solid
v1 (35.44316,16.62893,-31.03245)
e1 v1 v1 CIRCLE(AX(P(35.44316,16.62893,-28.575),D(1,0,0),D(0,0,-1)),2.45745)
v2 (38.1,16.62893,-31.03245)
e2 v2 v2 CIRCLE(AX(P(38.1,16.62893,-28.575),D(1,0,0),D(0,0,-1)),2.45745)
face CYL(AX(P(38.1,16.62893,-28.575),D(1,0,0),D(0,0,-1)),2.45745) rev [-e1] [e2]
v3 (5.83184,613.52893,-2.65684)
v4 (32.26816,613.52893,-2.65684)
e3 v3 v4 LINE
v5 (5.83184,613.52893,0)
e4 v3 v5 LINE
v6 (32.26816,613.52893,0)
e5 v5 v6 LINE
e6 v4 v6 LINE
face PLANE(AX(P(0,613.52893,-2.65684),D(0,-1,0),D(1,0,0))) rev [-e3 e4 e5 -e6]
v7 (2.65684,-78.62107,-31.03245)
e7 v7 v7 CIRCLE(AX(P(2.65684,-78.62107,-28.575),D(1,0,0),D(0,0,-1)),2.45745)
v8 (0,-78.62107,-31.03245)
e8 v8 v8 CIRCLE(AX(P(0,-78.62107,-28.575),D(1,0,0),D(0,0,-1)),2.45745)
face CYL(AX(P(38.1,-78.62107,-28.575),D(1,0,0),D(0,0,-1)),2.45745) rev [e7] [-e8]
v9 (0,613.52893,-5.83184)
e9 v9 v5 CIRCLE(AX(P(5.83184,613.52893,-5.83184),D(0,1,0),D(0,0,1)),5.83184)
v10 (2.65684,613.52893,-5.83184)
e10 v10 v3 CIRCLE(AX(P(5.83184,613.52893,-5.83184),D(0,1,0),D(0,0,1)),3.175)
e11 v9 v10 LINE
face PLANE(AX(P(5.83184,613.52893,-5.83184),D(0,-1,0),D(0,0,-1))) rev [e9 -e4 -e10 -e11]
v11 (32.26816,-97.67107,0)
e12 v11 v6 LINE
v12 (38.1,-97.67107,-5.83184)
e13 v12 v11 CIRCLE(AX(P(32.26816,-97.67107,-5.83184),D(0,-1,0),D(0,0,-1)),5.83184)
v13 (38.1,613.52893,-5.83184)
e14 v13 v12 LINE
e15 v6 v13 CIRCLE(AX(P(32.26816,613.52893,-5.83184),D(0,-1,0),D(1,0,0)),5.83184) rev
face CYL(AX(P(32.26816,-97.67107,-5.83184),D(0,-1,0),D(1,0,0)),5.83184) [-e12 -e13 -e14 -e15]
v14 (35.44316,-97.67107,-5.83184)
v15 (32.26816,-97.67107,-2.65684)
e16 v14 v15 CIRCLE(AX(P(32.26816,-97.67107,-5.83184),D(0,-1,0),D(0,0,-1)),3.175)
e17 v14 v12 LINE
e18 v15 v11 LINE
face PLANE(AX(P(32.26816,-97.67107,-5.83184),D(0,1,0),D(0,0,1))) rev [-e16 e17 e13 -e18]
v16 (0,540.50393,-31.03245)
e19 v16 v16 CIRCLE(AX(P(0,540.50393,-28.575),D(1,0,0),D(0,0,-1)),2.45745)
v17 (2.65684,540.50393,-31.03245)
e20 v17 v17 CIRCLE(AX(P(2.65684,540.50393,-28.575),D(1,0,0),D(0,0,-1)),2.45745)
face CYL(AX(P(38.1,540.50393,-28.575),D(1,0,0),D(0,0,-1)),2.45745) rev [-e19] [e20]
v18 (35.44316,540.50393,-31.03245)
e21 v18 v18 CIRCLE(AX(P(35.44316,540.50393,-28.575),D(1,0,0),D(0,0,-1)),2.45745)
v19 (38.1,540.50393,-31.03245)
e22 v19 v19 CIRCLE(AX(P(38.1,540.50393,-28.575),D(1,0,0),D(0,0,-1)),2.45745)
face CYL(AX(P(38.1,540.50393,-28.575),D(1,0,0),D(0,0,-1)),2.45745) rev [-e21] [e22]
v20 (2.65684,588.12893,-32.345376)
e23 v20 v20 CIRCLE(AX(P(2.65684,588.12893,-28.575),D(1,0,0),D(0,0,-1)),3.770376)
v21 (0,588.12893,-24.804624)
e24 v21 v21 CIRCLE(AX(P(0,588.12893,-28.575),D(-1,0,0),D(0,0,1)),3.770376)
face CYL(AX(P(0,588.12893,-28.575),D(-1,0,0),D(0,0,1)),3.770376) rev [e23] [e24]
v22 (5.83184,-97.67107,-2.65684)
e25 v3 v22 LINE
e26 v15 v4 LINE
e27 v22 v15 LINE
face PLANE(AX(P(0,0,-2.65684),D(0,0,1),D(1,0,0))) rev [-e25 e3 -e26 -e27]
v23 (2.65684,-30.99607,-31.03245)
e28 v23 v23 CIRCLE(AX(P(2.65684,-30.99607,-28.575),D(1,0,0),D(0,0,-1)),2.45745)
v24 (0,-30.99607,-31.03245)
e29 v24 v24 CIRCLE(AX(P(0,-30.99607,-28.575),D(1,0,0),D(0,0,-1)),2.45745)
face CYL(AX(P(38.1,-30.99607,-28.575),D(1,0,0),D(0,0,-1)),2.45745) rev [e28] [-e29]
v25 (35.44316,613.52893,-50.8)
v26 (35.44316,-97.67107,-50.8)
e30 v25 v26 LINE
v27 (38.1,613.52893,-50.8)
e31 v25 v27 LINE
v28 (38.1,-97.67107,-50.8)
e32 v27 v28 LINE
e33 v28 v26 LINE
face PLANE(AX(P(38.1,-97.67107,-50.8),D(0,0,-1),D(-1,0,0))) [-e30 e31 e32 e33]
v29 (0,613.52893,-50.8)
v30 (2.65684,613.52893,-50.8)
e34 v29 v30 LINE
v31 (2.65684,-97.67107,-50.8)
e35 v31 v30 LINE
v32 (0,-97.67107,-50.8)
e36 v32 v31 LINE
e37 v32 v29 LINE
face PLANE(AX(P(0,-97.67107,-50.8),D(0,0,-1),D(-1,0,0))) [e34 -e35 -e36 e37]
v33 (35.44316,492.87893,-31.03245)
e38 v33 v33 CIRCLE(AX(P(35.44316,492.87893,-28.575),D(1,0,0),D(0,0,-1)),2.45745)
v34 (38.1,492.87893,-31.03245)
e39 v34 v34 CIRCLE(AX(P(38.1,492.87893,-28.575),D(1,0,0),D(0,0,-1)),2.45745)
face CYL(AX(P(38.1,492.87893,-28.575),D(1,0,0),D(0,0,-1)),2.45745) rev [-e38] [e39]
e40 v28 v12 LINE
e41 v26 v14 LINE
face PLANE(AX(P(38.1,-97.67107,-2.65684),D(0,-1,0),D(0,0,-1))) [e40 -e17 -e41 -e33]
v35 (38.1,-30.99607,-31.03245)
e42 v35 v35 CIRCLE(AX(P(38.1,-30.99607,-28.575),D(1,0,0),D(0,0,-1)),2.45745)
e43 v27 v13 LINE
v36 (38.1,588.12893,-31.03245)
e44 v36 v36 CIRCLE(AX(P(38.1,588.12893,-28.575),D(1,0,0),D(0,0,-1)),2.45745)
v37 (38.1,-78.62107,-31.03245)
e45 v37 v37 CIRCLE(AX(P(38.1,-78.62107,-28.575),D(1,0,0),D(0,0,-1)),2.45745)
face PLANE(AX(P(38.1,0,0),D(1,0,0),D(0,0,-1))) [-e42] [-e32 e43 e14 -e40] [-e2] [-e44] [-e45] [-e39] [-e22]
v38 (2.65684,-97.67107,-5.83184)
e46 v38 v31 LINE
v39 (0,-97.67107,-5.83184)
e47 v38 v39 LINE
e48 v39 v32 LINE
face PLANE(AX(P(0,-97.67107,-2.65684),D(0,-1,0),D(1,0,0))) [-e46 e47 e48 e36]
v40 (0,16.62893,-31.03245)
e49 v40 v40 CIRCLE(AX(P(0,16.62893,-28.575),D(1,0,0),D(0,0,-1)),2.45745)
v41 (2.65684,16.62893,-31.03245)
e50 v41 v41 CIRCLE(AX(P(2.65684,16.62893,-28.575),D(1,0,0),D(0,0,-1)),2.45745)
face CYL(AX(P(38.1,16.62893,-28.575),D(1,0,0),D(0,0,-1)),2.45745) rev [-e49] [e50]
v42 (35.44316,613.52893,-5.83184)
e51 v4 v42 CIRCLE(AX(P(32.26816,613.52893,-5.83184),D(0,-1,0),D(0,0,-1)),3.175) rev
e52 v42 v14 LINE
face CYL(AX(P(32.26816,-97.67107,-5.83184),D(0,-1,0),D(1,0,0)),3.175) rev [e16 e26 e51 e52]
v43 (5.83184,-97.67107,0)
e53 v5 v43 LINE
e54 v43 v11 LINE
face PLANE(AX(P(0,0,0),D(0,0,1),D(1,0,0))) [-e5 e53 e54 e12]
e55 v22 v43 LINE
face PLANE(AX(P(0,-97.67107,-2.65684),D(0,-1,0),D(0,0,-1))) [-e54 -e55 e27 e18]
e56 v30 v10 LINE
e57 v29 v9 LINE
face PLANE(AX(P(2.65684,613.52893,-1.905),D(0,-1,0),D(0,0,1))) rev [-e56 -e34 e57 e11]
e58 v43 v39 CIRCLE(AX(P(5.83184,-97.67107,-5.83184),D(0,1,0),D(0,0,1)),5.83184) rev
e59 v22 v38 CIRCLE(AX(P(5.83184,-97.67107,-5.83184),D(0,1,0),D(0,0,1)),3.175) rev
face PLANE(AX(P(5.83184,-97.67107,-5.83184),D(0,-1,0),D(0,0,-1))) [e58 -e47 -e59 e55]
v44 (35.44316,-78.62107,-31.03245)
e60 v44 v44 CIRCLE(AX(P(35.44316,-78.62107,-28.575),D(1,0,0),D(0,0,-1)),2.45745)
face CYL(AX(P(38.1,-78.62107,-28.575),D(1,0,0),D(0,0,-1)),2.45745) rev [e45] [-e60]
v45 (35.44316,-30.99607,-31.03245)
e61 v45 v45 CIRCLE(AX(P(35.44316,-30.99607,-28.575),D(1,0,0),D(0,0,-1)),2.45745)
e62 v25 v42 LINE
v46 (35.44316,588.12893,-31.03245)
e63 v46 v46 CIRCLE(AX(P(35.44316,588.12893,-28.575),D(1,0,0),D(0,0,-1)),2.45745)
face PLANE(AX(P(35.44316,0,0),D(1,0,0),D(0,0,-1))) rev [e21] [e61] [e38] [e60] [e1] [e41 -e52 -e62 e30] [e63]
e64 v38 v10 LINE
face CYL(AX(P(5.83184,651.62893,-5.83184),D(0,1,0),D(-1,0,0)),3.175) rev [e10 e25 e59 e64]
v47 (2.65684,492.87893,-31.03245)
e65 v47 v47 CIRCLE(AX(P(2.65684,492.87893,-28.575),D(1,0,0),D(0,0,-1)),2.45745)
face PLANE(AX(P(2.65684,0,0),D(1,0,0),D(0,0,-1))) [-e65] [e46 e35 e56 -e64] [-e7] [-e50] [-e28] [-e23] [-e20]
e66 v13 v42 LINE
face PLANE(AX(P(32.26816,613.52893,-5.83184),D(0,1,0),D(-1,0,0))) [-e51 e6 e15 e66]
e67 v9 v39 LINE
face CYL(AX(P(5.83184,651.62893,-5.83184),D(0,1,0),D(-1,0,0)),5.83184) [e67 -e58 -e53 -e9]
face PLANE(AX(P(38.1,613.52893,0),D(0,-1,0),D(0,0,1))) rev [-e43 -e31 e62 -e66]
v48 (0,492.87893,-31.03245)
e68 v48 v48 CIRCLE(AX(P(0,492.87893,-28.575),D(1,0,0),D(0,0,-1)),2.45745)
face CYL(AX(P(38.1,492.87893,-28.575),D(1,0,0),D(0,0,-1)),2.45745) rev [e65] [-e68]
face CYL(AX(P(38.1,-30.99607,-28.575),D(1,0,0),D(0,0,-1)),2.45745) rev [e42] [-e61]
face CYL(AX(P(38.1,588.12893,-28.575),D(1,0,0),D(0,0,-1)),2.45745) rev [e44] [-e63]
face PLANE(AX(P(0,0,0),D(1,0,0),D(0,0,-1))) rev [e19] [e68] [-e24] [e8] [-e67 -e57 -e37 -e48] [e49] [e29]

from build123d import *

# Parameters (mm, degrees)
SKETCH1_W                            = 38.1
SKETCH1_H                            = 749.3
BASE_FLANGE1_DEPTH                   = 2.65684
EDGE_FLANGE1_STRIP_W                 = 16.97736
EDGE_FLANGE1_STRIP_H                 = 2.65684
EDGE_FLANGE1_STRIP_CUT_DEPTH         = 749.3
EDGE_FLANGE1_STRIP_2_W               = 16.97736
EDGE_FLANGE1_STRIP_2_H               = 2.65684
EDGE_FLANGE1_STRIP_CUT_2_DEPTH       = 749.3
EDGE_FLANGE1_DEPTH                   = 749.3
EDGE_FLANGE1_BEND_DEPTH              = 749.3
CUT_EXTRUDE1_START                   = -38.1
CUT_EXTRUDE1_OUTLINE_W               = 50.8
CUT_EXTRUDE1_OUTLINE_H               = 38.1
CUT_EXTRUDE1_DEPTH                   = 38.1
F_10_0_1935_DIAMETER_HOLE1_D         = 4.9149
F_19_64_0_29688_DIAMETER_HOLE3_D     = 7.540752
F_19_64_0_29688_DIAMETER_HOLE3_DEPTH = 35.44216


# Read off the part's stored shape, not the designer's step: Cut-Extrude1
# Sheet-metal steps are written as plain solids
with BuildPart() as part:
    # Sketch1 → Base-Flange1 (new body)
    with BuildSketch(Plane.XY):
        with Locations((19.05, 276.978929766)):
            Rectangle(SKETCH1_W, SKETCH1_H)
    extrude(amount=-BASE_FLANGE1_DEPTH)

    # Edge-Flange1 strip (across the edge) → Edge-Flange1 strip cut (cut)
    with BuildSketch(Plane(origin=(38.1, 651.628929766, -2.65684), x_dir=(-1, 0, 0), z_dir=(0, -1, 0))):
        with Locations((-2.65684, -1.32842)):
            Rectangle(EDGE_FLANGE1_STRIP_W, EDGE_FLANGE1_STRIP_H)
    extrude(amount=EDGE_FLANGE1_STRIP_CUT_DEPTH, mode=Mode.SUBTRACT)

    # Edge-Flange1 strip 2 (across the edge) → Edge-Flange1 strip cut 2 (cut)
    with BuildSketch(Plane(origin=(0, -97.671070234, -2.65684), x_dir=(1, 0, 0), z_dir=(0, 1, 0))):
        with Locations((-2.65684, -1.32842)):
            Rectangle(EDGE_FLANGE1_STRIP_2_W, EDGE_FLANGE1_STRIP_2_H)
    extrude(amount=EDGE_FLANGE1_STRIP_CUT_2_DEPTH, mode=Mode.SUBTRACT)

    # Edge-Flange1 section (across the edge) → Edge-Flange1 (add)
    with BuildSketch(Plane(origin=(38.1, 651.628929766, -2.65684), x_dir=(-1, 0, 0), z_dir=(0, -1, 0))):
        with BuildLine():
            Line((0, 3.175), (0, 48.14316))
            Line((0, 48.14316), (2.65684, 48.14316))
            Line((2.65684, 48.14316), (2.65684, 3.175))
            ThreePointArc((2.65684, 3.175), (3.58677597, 0.92993597), (5.83184, 0))
            Line((5.83184, 0), (5.83184, -2.65684))
            ThreePointArc((5.83184, -2.65684), (1.708106389, -0.948733611), (0, 3.175))
        make_face()
    extrude(amount=EDGE_FLANGE1_DEPTH)

    # Edge-Flange1 section 2 (across the edge) → Edge-Flange1 bend (add)
    with BuildSketch(Plane(origin=(0, -97.671070234, -2.65684), x_dir=(1, 0, 0), z_dir=(0, 1, 0))):
        with BuildLine():
            Line((0, 3.175), (0, 48.14316))
            Line((0, 48.14316), (2.65684, 48.14316))
            Line((2.65684, 48.14316), (2.65684, 3.175))
            ThreePointArc((2.65684, 3.175), (3.58677597, 0.92993597), (5.83184, 0))
            Line((5.83184, 0), (5.83184, -2.65684))
            ThreePointArc((5.83184, -2.65684), (1.708106389, -0.948733611), (0, 3.175))
        make_face()
    extrude(amount=EDGE_FLANGE1_BEND_DEPTH)

    # Cut-Extrude1 outline → Cut-Extrude1 (cut)
    with BuildSketch(Plane(origin=(38.1, 0, 0), x_dir=(0, 0, -1), z_dir=(1, 0, 0)).offset(CUT_EXTRUDE1_START)):
        with Locations((25.4, 632.578929766)):
            Rectangle(CUT_EXTRUDE1_OUTLINE_W, CUT_EXTRUDE1_OUTLINE_H)
    extrude(amount=CUT_EXTRUDE1_DEPTH, mode=Mode.SUBTRACT)

    # #10 (0.1935) Diameter Hole1 (through all)
    with Locations(Plane(origin=(38.1, 0, 0), x_dir=(0, 0, -1), z_dir=(1, 0, 0))):
        with Locations((28.575, -78.621070234), (28.575, -30.996070234), (28.575, 16.628929766), (28.575, 588.128929766), (28.575, 540.503929766), (28.575, 492.878929766)):
            Hole(F_10_0_1935_DIAMETER_HOLE1_D / 2)

    # 19/64 (0.29688) Diameter Hole3
    with Locations(Plane.ZY):
        with Locations((-28.575, 588.128929766)):
            Hole(F_19_64_0_29688_DIAMETER_HOLE3_D / 2, depth=F_19_64_0_29688_DIAMETER_HOLE3_DEPTH)


solid = part.part
